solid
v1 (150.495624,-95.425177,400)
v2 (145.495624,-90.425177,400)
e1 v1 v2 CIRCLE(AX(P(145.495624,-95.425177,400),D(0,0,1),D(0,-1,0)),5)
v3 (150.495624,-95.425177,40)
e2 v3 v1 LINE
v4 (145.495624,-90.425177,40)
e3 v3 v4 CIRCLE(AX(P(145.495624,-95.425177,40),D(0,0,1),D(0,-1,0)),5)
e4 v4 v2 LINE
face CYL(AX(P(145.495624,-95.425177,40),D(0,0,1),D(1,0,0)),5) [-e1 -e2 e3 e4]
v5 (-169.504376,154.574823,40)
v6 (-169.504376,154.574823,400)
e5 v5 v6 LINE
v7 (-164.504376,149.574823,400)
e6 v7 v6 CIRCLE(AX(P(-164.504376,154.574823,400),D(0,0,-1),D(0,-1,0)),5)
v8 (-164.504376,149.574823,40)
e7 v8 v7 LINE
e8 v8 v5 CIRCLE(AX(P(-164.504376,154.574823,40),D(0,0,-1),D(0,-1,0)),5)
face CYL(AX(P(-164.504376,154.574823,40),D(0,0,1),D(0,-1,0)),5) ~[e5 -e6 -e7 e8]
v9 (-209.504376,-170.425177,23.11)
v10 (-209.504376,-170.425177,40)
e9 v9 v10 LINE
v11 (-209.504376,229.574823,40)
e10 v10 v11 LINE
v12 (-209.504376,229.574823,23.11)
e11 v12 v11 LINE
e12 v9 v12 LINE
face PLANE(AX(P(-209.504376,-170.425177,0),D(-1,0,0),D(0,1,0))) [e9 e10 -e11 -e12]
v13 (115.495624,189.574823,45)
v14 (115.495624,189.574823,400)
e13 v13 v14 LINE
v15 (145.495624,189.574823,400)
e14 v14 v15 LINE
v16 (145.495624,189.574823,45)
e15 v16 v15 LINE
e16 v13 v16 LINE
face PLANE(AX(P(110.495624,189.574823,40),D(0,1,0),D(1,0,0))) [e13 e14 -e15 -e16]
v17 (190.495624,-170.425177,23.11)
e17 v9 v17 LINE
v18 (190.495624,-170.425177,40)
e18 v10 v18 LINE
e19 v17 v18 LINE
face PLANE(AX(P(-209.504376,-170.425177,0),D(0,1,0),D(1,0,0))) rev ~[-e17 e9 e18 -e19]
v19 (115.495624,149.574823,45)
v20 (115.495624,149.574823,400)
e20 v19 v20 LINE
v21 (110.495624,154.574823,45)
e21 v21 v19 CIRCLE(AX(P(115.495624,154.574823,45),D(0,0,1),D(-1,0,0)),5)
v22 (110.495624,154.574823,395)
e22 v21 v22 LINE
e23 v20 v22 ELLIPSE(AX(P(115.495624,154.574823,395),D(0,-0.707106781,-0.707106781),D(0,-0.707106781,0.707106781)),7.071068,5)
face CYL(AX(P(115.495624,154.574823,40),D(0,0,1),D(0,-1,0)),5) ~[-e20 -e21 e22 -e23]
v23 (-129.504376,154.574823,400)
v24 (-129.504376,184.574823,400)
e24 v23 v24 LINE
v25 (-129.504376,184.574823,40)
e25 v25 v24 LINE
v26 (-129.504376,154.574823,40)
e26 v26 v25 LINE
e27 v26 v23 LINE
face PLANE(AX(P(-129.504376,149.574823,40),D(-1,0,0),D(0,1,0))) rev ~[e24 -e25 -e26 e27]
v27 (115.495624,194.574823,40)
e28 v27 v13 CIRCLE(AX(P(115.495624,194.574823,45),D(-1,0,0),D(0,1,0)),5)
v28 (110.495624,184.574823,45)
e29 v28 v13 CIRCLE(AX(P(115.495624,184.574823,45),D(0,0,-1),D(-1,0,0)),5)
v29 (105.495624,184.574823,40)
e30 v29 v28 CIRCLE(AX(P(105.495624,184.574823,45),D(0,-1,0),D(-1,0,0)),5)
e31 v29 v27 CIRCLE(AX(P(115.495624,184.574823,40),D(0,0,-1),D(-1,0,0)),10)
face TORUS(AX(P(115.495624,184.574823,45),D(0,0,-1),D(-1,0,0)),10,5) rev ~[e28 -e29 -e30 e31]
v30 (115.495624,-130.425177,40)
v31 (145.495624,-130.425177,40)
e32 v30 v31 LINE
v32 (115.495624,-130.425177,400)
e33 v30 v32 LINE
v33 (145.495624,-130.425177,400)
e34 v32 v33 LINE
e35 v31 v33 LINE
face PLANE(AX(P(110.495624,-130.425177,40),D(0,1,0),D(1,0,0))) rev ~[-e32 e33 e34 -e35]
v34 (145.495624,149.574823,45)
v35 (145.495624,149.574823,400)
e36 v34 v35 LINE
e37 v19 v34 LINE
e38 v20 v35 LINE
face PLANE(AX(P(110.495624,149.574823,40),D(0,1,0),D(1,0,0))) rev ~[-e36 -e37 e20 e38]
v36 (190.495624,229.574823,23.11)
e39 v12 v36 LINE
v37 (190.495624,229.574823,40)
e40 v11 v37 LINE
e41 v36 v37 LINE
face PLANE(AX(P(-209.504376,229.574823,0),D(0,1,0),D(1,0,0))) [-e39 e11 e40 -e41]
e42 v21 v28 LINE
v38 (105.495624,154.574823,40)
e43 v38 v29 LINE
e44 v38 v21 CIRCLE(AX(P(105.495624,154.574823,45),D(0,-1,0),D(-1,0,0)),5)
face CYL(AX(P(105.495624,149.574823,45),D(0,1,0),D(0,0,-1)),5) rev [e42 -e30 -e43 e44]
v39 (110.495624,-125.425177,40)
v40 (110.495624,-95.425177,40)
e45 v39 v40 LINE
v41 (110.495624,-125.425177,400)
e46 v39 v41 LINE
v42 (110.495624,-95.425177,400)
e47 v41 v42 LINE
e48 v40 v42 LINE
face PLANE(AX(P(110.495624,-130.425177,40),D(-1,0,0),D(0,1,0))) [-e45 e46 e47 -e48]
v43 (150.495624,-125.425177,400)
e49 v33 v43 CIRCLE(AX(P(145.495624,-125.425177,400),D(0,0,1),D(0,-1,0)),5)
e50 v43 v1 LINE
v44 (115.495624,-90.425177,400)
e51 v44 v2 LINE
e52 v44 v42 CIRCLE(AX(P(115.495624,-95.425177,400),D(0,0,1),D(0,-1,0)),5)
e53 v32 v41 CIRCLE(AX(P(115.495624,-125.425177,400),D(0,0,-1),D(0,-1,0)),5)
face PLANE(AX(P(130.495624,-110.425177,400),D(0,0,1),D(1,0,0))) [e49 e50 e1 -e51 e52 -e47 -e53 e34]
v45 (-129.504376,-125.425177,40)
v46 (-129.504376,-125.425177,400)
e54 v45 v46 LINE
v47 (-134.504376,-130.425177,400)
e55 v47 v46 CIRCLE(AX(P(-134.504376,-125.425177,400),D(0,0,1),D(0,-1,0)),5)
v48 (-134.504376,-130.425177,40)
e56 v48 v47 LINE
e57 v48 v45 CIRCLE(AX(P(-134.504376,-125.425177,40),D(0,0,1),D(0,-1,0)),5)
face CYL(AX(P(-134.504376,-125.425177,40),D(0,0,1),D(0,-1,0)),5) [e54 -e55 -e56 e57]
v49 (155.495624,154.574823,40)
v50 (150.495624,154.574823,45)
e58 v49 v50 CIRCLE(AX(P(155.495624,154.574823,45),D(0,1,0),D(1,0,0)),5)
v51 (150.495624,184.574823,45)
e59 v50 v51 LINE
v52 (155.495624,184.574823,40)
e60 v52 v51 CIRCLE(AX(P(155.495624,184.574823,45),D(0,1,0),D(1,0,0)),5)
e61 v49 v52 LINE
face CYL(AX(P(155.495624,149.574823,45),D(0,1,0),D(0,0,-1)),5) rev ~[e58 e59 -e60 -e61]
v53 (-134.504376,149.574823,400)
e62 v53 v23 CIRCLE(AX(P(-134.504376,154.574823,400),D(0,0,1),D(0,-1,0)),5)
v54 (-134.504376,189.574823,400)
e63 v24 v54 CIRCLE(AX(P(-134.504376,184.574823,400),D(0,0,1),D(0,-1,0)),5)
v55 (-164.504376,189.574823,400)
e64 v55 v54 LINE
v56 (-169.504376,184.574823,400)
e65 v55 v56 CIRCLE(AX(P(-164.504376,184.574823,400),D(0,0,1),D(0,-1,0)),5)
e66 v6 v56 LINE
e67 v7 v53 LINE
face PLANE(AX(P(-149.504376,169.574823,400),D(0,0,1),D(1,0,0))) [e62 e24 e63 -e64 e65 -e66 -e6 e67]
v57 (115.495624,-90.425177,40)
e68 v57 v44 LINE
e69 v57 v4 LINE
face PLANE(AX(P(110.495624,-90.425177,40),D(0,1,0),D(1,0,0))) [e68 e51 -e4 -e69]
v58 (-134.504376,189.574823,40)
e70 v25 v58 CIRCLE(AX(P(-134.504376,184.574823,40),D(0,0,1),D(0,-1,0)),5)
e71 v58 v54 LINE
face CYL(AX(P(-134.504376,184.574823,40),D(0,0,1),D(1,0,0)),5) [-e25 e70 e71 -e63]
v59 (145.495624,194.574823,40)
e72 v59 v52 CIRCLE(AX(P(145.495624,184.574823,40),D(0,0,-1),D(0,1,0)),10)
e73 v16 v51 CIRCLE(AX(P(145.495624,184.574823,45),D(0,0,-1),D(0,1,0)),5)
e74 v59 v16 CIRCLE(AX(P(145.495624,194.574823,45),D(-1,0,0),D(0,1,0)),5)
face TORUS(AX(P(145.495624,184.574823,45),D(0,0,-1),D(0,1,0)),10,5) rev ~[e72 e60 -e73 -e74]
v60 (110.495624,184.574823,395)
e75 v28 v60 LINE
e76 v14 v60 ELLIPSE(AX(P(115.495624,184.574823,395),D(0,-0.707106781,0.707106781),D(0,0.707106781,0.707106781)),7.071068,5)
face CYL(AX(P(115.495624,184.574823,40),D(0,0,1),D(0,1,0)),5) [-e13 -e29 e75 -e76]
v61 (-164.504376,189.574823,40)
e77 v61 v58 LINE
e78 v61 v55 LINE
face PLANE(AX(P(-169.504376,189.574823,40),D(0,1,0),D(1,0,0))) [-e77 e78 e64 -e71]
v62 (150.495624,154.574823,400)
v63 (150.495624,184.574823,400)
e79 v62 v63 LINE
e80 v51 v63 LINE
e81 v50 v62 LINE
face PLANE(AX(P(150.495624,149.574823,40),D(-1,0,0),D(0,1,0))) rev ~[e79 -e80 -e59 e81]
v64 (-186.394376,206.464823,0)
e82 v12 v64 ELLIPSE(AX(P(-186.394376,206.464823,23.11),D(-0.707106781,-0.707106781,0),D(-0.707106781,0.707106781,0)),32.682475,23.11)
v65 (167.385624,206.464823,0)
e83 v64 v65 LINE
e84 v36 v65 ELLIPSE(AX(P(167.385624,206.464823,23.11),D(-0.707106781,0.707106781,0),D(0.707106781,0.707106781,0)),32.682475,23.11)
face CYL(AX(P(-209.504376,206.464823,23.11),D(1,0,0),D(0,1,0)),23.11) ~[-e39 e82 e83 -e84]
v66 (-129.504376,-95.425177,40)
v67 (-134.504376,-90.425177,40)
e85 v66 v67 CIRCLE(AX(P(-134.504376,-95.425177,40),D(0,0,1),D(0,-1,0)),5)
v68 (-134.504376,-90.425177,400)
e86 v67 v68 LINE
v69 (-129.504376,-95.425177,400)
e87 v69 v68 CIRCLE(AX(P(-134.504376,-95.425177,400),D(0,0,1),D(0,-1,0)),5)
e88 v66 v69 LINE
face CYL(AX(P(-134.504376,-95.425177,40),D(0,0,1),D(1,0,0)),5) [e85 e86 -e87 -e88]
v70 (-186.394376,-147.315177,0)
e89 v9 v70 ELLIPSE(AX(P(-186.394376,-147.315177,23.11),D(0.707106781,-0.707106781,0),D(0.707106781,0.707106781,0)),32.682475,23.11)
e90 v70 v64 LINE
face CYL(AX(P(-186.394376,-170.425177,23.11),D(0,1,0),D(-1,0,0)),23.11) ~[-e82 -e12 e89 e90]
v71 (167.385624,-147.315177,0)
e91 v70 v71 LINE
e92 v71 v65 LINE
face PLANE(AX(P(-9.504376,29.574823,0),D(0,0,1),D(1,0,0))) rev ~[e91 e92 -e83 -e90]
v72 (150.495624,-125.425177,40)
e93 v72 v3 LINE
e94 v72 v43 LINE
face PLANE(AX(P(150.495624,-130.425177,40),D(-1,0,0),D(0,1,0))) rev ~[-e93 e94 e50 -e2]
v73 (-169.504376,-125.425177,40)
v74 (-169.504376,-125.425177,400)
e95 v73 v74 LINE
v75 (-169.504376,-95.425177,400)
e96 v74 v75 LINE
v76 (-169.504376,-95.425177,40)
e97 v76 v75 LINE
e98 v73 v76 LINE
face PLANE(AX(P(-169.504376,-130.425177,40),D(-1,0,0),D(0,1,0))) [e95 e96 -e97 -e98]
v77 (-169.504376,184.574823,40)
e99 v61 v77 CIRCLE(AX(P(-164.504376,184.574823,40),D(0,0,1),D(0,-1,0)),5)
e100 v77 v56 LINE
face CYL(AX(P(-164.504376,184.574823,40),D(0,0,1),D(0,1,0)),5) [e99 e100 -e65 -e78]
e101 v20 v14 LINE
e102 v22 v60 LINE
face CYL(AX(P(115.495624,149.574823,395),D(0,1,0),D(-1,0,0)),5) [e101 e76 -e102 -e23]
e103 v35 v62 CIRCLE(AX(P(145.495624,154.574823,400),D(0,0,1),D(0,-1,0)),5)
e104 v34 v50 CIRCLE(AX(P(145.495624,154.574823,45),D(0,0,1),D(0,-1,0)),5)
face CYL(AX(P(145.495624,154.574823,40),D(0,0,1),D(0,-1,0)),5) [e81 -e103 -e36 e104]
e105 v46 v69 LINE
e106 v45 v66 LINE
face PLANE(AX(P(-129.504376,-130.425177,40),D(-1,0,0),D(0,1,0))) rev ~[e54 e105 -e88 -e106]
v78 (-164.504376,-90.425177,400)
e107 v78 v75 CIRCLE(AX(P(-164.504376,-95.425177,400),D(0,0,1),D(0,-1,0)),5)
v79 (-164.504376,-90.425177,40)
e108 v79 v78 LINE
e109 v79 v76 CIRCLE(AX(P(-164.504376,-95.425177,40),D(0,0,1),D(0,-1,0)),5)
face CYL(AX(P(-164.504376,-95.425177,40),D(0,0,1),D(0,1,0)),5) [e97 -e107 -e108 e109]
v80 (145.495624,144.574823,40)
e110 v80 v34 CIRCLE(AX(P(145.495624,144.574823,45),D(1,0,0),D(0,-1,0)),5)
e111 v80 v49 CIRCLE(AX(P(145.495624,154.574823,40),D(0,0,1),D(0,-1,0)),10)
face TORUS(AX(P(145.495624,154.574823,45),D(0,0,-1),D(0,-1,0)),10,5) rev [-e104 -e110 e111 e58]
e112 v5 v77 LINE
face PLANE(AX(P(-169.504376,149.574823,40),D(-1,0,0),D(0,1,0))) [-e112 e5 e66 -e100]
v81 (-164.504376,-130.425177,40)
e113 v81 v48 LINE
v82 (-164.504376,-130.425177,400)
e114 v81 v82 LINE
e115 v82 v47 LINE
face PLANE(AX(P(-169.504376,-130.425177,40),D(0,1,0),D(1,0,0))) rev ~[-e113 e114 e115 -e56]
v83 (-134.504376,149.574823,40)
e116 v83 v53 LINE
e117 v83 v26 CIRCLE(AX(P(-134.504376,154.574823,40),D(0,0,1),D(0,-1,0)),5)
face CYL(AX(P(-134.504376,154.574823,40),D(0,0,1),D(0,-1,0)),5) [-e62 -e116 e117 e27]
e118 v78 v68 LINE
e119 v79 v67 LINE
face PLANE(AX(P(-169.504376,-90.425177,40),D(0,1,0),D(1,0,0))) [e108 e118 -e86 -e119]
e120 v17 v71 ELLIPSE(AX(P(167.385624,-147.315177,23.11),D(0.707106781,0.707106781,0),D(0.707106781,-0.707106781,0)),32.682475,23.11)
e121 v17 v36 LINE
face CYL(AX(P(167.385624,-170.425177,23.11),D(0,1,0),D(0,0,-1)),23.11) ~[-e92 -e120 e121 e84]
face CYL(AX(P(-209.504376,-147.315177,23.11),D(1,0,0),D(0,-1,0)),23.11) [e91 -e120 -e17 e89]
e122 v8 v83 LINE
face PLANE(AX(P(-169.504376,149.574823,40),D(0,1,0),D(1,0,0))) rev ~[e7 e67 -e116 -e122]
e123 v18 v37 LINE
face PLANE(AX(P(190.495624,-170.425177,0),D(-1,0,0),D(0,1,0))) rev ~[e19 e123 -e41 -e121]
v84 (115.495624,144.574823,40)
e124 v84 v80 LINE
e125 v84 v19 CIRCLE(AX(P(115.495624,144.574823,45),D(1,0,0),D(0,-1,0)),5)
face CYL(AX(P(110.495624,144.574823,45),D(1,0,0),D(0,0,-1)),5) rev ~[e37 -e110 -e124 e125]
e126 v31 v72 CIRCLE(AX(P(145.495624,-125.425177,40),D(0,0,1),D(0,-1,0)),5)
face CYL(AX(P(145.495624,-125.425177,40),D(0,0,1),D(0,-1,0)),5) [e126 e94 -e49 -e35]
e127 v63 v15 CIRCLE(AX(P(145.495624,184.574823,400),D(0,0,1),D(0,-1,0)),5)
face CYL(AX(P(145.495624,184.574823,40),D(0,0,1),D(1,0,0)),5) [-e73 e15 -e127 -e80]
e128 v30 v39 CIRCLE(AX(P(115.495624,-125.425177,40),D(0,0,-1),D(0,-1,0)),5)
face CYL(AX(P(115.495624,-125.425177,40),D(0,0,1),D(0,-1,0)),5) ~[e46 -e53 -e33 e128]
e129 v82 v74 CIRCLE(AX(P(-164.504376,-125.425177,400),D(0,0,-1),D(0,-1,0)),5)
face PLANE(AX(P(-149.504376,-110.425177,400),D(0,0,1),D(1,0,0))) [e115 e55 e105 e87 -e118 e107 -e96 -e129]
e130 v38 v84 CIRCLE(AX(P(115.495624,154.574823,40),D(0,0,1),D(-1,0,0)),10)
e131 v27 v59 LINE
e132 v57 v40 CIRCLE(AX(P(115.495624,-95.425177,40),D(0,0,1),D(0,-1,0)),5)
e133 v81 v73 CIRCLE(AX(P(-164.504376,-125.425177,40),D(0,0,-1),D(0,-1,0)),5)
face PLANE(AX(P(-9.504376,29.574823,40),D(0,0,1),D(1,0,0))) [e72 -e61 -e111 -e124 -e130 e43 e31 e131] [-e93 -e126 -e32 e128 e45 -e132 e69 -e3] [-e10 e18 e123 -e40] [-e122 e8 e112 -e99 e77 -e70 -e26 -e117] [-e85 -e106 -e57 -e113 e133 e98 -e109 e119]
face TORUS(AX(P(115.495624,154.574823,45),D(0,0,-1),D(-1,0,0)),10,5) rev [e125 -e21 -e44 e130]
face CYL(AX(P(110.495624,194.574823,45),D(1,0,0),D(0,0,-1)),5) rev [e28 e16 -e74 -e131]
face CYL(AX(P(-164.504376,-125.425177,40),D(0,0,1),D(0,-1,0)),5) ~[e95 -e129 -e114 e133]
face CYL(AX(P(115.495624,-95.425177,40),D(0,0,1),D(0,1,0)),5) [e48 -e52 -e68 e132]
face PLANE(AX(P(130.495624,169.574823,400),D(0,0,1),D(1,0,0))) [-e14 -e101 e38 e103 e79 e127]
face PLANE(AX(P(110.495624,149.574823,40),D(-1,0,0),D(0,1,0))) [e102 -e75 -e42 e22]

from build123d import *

# Parameters (mm, degrees)
F0_W     = 400
F0_H     = 400
F1_DEPTH = 40
F2_W     = 40
F2_H     = 40
F3_DEPTH = 360
F4_R     = 23.11
F5_R     = 5
F6_R     = 5


with BuildPart() as f1:
    # F0 (on Top) → F1 (new body)
    with BuildSketch(Plane.XY):
        with Locations((-9.5043759793, 29.5748232458)):
            Rectangle(F0_W, F0_H)
    extrude(amount=F1_DEPTH)

    # F2 (on face) → F3 (join)
    with BuildSketch(Plane.XY.offset(40)):
        with Locations((130.4956240207, -110.4251767542)):
            Rectangle(F2_W, F2_H)
        with Locations((-149.5043759793, -110.4251767542)):
            Rectangle(F2_W, F2_H)
        with Locations((-149.5043759793, 169.5748232458)):
            Rectangle(F2_W, F2_H)
        with Locations((130.4956240207, 169.5748232458)):
            Rectangle(F2_W, F2_H)
    extrude(amount=F3_DEPTH)

    # F4
    f4_edges = [f1.edges().sort_by_distance(p)[0] for p in [
        (-209.504376, 29.574823, 0),
        (-9.504376, 229.574823, 0),
        (-9.504376, -170.425177, 0),
        (190.495624, 29.574823, 0),
    ]]
    fillet(f4_edges, radius=F4_R)

    # F5
    f5_edges = [f1.edges().sort_by_distance(p)[0] for p in [
        (-129.504376, 189.574823, 220),
        (-129.504376, 149.574823, 220),
        (-169.504376, -130.425177, 220),
        (-129.504376, -130.425177, 220),
        (-129.504376, -90.425177, 220),
        (-169.504376, -90.425177, 220),
        (-169.504376, 189.574823, 220),
        (-169.504376, 149.574823, 220),
    ]]
    fillet(f5_edges, radius=F5_R)

    # F6
    f6_edges = [f1.edges().sort_by_distance(p)[0] for p in [
        (150.495624, -130.425177, 220),
        (150.495624, -90.425177, 220),
        (150.495624, 149.574823, 220),
        (150.495624, 189.574823, 220),
        (110.495624, 189.574823, 220),
        (110.495624, 149.574823, 220),
        (110.495624, 169.574823, 40),
        (110.495624, 169.574823, 400),
        (110.495624, -90.425177, 220),
        (110.495624, -130.425177, 220),
        (130.495624, 189.574823, 40),
        (130.495624, 149.574823, 40),
        (150.495624, 169.574823, 40),
    ]]
    fillet(f6_edges, radius=F6_R)


solid = f1.part
